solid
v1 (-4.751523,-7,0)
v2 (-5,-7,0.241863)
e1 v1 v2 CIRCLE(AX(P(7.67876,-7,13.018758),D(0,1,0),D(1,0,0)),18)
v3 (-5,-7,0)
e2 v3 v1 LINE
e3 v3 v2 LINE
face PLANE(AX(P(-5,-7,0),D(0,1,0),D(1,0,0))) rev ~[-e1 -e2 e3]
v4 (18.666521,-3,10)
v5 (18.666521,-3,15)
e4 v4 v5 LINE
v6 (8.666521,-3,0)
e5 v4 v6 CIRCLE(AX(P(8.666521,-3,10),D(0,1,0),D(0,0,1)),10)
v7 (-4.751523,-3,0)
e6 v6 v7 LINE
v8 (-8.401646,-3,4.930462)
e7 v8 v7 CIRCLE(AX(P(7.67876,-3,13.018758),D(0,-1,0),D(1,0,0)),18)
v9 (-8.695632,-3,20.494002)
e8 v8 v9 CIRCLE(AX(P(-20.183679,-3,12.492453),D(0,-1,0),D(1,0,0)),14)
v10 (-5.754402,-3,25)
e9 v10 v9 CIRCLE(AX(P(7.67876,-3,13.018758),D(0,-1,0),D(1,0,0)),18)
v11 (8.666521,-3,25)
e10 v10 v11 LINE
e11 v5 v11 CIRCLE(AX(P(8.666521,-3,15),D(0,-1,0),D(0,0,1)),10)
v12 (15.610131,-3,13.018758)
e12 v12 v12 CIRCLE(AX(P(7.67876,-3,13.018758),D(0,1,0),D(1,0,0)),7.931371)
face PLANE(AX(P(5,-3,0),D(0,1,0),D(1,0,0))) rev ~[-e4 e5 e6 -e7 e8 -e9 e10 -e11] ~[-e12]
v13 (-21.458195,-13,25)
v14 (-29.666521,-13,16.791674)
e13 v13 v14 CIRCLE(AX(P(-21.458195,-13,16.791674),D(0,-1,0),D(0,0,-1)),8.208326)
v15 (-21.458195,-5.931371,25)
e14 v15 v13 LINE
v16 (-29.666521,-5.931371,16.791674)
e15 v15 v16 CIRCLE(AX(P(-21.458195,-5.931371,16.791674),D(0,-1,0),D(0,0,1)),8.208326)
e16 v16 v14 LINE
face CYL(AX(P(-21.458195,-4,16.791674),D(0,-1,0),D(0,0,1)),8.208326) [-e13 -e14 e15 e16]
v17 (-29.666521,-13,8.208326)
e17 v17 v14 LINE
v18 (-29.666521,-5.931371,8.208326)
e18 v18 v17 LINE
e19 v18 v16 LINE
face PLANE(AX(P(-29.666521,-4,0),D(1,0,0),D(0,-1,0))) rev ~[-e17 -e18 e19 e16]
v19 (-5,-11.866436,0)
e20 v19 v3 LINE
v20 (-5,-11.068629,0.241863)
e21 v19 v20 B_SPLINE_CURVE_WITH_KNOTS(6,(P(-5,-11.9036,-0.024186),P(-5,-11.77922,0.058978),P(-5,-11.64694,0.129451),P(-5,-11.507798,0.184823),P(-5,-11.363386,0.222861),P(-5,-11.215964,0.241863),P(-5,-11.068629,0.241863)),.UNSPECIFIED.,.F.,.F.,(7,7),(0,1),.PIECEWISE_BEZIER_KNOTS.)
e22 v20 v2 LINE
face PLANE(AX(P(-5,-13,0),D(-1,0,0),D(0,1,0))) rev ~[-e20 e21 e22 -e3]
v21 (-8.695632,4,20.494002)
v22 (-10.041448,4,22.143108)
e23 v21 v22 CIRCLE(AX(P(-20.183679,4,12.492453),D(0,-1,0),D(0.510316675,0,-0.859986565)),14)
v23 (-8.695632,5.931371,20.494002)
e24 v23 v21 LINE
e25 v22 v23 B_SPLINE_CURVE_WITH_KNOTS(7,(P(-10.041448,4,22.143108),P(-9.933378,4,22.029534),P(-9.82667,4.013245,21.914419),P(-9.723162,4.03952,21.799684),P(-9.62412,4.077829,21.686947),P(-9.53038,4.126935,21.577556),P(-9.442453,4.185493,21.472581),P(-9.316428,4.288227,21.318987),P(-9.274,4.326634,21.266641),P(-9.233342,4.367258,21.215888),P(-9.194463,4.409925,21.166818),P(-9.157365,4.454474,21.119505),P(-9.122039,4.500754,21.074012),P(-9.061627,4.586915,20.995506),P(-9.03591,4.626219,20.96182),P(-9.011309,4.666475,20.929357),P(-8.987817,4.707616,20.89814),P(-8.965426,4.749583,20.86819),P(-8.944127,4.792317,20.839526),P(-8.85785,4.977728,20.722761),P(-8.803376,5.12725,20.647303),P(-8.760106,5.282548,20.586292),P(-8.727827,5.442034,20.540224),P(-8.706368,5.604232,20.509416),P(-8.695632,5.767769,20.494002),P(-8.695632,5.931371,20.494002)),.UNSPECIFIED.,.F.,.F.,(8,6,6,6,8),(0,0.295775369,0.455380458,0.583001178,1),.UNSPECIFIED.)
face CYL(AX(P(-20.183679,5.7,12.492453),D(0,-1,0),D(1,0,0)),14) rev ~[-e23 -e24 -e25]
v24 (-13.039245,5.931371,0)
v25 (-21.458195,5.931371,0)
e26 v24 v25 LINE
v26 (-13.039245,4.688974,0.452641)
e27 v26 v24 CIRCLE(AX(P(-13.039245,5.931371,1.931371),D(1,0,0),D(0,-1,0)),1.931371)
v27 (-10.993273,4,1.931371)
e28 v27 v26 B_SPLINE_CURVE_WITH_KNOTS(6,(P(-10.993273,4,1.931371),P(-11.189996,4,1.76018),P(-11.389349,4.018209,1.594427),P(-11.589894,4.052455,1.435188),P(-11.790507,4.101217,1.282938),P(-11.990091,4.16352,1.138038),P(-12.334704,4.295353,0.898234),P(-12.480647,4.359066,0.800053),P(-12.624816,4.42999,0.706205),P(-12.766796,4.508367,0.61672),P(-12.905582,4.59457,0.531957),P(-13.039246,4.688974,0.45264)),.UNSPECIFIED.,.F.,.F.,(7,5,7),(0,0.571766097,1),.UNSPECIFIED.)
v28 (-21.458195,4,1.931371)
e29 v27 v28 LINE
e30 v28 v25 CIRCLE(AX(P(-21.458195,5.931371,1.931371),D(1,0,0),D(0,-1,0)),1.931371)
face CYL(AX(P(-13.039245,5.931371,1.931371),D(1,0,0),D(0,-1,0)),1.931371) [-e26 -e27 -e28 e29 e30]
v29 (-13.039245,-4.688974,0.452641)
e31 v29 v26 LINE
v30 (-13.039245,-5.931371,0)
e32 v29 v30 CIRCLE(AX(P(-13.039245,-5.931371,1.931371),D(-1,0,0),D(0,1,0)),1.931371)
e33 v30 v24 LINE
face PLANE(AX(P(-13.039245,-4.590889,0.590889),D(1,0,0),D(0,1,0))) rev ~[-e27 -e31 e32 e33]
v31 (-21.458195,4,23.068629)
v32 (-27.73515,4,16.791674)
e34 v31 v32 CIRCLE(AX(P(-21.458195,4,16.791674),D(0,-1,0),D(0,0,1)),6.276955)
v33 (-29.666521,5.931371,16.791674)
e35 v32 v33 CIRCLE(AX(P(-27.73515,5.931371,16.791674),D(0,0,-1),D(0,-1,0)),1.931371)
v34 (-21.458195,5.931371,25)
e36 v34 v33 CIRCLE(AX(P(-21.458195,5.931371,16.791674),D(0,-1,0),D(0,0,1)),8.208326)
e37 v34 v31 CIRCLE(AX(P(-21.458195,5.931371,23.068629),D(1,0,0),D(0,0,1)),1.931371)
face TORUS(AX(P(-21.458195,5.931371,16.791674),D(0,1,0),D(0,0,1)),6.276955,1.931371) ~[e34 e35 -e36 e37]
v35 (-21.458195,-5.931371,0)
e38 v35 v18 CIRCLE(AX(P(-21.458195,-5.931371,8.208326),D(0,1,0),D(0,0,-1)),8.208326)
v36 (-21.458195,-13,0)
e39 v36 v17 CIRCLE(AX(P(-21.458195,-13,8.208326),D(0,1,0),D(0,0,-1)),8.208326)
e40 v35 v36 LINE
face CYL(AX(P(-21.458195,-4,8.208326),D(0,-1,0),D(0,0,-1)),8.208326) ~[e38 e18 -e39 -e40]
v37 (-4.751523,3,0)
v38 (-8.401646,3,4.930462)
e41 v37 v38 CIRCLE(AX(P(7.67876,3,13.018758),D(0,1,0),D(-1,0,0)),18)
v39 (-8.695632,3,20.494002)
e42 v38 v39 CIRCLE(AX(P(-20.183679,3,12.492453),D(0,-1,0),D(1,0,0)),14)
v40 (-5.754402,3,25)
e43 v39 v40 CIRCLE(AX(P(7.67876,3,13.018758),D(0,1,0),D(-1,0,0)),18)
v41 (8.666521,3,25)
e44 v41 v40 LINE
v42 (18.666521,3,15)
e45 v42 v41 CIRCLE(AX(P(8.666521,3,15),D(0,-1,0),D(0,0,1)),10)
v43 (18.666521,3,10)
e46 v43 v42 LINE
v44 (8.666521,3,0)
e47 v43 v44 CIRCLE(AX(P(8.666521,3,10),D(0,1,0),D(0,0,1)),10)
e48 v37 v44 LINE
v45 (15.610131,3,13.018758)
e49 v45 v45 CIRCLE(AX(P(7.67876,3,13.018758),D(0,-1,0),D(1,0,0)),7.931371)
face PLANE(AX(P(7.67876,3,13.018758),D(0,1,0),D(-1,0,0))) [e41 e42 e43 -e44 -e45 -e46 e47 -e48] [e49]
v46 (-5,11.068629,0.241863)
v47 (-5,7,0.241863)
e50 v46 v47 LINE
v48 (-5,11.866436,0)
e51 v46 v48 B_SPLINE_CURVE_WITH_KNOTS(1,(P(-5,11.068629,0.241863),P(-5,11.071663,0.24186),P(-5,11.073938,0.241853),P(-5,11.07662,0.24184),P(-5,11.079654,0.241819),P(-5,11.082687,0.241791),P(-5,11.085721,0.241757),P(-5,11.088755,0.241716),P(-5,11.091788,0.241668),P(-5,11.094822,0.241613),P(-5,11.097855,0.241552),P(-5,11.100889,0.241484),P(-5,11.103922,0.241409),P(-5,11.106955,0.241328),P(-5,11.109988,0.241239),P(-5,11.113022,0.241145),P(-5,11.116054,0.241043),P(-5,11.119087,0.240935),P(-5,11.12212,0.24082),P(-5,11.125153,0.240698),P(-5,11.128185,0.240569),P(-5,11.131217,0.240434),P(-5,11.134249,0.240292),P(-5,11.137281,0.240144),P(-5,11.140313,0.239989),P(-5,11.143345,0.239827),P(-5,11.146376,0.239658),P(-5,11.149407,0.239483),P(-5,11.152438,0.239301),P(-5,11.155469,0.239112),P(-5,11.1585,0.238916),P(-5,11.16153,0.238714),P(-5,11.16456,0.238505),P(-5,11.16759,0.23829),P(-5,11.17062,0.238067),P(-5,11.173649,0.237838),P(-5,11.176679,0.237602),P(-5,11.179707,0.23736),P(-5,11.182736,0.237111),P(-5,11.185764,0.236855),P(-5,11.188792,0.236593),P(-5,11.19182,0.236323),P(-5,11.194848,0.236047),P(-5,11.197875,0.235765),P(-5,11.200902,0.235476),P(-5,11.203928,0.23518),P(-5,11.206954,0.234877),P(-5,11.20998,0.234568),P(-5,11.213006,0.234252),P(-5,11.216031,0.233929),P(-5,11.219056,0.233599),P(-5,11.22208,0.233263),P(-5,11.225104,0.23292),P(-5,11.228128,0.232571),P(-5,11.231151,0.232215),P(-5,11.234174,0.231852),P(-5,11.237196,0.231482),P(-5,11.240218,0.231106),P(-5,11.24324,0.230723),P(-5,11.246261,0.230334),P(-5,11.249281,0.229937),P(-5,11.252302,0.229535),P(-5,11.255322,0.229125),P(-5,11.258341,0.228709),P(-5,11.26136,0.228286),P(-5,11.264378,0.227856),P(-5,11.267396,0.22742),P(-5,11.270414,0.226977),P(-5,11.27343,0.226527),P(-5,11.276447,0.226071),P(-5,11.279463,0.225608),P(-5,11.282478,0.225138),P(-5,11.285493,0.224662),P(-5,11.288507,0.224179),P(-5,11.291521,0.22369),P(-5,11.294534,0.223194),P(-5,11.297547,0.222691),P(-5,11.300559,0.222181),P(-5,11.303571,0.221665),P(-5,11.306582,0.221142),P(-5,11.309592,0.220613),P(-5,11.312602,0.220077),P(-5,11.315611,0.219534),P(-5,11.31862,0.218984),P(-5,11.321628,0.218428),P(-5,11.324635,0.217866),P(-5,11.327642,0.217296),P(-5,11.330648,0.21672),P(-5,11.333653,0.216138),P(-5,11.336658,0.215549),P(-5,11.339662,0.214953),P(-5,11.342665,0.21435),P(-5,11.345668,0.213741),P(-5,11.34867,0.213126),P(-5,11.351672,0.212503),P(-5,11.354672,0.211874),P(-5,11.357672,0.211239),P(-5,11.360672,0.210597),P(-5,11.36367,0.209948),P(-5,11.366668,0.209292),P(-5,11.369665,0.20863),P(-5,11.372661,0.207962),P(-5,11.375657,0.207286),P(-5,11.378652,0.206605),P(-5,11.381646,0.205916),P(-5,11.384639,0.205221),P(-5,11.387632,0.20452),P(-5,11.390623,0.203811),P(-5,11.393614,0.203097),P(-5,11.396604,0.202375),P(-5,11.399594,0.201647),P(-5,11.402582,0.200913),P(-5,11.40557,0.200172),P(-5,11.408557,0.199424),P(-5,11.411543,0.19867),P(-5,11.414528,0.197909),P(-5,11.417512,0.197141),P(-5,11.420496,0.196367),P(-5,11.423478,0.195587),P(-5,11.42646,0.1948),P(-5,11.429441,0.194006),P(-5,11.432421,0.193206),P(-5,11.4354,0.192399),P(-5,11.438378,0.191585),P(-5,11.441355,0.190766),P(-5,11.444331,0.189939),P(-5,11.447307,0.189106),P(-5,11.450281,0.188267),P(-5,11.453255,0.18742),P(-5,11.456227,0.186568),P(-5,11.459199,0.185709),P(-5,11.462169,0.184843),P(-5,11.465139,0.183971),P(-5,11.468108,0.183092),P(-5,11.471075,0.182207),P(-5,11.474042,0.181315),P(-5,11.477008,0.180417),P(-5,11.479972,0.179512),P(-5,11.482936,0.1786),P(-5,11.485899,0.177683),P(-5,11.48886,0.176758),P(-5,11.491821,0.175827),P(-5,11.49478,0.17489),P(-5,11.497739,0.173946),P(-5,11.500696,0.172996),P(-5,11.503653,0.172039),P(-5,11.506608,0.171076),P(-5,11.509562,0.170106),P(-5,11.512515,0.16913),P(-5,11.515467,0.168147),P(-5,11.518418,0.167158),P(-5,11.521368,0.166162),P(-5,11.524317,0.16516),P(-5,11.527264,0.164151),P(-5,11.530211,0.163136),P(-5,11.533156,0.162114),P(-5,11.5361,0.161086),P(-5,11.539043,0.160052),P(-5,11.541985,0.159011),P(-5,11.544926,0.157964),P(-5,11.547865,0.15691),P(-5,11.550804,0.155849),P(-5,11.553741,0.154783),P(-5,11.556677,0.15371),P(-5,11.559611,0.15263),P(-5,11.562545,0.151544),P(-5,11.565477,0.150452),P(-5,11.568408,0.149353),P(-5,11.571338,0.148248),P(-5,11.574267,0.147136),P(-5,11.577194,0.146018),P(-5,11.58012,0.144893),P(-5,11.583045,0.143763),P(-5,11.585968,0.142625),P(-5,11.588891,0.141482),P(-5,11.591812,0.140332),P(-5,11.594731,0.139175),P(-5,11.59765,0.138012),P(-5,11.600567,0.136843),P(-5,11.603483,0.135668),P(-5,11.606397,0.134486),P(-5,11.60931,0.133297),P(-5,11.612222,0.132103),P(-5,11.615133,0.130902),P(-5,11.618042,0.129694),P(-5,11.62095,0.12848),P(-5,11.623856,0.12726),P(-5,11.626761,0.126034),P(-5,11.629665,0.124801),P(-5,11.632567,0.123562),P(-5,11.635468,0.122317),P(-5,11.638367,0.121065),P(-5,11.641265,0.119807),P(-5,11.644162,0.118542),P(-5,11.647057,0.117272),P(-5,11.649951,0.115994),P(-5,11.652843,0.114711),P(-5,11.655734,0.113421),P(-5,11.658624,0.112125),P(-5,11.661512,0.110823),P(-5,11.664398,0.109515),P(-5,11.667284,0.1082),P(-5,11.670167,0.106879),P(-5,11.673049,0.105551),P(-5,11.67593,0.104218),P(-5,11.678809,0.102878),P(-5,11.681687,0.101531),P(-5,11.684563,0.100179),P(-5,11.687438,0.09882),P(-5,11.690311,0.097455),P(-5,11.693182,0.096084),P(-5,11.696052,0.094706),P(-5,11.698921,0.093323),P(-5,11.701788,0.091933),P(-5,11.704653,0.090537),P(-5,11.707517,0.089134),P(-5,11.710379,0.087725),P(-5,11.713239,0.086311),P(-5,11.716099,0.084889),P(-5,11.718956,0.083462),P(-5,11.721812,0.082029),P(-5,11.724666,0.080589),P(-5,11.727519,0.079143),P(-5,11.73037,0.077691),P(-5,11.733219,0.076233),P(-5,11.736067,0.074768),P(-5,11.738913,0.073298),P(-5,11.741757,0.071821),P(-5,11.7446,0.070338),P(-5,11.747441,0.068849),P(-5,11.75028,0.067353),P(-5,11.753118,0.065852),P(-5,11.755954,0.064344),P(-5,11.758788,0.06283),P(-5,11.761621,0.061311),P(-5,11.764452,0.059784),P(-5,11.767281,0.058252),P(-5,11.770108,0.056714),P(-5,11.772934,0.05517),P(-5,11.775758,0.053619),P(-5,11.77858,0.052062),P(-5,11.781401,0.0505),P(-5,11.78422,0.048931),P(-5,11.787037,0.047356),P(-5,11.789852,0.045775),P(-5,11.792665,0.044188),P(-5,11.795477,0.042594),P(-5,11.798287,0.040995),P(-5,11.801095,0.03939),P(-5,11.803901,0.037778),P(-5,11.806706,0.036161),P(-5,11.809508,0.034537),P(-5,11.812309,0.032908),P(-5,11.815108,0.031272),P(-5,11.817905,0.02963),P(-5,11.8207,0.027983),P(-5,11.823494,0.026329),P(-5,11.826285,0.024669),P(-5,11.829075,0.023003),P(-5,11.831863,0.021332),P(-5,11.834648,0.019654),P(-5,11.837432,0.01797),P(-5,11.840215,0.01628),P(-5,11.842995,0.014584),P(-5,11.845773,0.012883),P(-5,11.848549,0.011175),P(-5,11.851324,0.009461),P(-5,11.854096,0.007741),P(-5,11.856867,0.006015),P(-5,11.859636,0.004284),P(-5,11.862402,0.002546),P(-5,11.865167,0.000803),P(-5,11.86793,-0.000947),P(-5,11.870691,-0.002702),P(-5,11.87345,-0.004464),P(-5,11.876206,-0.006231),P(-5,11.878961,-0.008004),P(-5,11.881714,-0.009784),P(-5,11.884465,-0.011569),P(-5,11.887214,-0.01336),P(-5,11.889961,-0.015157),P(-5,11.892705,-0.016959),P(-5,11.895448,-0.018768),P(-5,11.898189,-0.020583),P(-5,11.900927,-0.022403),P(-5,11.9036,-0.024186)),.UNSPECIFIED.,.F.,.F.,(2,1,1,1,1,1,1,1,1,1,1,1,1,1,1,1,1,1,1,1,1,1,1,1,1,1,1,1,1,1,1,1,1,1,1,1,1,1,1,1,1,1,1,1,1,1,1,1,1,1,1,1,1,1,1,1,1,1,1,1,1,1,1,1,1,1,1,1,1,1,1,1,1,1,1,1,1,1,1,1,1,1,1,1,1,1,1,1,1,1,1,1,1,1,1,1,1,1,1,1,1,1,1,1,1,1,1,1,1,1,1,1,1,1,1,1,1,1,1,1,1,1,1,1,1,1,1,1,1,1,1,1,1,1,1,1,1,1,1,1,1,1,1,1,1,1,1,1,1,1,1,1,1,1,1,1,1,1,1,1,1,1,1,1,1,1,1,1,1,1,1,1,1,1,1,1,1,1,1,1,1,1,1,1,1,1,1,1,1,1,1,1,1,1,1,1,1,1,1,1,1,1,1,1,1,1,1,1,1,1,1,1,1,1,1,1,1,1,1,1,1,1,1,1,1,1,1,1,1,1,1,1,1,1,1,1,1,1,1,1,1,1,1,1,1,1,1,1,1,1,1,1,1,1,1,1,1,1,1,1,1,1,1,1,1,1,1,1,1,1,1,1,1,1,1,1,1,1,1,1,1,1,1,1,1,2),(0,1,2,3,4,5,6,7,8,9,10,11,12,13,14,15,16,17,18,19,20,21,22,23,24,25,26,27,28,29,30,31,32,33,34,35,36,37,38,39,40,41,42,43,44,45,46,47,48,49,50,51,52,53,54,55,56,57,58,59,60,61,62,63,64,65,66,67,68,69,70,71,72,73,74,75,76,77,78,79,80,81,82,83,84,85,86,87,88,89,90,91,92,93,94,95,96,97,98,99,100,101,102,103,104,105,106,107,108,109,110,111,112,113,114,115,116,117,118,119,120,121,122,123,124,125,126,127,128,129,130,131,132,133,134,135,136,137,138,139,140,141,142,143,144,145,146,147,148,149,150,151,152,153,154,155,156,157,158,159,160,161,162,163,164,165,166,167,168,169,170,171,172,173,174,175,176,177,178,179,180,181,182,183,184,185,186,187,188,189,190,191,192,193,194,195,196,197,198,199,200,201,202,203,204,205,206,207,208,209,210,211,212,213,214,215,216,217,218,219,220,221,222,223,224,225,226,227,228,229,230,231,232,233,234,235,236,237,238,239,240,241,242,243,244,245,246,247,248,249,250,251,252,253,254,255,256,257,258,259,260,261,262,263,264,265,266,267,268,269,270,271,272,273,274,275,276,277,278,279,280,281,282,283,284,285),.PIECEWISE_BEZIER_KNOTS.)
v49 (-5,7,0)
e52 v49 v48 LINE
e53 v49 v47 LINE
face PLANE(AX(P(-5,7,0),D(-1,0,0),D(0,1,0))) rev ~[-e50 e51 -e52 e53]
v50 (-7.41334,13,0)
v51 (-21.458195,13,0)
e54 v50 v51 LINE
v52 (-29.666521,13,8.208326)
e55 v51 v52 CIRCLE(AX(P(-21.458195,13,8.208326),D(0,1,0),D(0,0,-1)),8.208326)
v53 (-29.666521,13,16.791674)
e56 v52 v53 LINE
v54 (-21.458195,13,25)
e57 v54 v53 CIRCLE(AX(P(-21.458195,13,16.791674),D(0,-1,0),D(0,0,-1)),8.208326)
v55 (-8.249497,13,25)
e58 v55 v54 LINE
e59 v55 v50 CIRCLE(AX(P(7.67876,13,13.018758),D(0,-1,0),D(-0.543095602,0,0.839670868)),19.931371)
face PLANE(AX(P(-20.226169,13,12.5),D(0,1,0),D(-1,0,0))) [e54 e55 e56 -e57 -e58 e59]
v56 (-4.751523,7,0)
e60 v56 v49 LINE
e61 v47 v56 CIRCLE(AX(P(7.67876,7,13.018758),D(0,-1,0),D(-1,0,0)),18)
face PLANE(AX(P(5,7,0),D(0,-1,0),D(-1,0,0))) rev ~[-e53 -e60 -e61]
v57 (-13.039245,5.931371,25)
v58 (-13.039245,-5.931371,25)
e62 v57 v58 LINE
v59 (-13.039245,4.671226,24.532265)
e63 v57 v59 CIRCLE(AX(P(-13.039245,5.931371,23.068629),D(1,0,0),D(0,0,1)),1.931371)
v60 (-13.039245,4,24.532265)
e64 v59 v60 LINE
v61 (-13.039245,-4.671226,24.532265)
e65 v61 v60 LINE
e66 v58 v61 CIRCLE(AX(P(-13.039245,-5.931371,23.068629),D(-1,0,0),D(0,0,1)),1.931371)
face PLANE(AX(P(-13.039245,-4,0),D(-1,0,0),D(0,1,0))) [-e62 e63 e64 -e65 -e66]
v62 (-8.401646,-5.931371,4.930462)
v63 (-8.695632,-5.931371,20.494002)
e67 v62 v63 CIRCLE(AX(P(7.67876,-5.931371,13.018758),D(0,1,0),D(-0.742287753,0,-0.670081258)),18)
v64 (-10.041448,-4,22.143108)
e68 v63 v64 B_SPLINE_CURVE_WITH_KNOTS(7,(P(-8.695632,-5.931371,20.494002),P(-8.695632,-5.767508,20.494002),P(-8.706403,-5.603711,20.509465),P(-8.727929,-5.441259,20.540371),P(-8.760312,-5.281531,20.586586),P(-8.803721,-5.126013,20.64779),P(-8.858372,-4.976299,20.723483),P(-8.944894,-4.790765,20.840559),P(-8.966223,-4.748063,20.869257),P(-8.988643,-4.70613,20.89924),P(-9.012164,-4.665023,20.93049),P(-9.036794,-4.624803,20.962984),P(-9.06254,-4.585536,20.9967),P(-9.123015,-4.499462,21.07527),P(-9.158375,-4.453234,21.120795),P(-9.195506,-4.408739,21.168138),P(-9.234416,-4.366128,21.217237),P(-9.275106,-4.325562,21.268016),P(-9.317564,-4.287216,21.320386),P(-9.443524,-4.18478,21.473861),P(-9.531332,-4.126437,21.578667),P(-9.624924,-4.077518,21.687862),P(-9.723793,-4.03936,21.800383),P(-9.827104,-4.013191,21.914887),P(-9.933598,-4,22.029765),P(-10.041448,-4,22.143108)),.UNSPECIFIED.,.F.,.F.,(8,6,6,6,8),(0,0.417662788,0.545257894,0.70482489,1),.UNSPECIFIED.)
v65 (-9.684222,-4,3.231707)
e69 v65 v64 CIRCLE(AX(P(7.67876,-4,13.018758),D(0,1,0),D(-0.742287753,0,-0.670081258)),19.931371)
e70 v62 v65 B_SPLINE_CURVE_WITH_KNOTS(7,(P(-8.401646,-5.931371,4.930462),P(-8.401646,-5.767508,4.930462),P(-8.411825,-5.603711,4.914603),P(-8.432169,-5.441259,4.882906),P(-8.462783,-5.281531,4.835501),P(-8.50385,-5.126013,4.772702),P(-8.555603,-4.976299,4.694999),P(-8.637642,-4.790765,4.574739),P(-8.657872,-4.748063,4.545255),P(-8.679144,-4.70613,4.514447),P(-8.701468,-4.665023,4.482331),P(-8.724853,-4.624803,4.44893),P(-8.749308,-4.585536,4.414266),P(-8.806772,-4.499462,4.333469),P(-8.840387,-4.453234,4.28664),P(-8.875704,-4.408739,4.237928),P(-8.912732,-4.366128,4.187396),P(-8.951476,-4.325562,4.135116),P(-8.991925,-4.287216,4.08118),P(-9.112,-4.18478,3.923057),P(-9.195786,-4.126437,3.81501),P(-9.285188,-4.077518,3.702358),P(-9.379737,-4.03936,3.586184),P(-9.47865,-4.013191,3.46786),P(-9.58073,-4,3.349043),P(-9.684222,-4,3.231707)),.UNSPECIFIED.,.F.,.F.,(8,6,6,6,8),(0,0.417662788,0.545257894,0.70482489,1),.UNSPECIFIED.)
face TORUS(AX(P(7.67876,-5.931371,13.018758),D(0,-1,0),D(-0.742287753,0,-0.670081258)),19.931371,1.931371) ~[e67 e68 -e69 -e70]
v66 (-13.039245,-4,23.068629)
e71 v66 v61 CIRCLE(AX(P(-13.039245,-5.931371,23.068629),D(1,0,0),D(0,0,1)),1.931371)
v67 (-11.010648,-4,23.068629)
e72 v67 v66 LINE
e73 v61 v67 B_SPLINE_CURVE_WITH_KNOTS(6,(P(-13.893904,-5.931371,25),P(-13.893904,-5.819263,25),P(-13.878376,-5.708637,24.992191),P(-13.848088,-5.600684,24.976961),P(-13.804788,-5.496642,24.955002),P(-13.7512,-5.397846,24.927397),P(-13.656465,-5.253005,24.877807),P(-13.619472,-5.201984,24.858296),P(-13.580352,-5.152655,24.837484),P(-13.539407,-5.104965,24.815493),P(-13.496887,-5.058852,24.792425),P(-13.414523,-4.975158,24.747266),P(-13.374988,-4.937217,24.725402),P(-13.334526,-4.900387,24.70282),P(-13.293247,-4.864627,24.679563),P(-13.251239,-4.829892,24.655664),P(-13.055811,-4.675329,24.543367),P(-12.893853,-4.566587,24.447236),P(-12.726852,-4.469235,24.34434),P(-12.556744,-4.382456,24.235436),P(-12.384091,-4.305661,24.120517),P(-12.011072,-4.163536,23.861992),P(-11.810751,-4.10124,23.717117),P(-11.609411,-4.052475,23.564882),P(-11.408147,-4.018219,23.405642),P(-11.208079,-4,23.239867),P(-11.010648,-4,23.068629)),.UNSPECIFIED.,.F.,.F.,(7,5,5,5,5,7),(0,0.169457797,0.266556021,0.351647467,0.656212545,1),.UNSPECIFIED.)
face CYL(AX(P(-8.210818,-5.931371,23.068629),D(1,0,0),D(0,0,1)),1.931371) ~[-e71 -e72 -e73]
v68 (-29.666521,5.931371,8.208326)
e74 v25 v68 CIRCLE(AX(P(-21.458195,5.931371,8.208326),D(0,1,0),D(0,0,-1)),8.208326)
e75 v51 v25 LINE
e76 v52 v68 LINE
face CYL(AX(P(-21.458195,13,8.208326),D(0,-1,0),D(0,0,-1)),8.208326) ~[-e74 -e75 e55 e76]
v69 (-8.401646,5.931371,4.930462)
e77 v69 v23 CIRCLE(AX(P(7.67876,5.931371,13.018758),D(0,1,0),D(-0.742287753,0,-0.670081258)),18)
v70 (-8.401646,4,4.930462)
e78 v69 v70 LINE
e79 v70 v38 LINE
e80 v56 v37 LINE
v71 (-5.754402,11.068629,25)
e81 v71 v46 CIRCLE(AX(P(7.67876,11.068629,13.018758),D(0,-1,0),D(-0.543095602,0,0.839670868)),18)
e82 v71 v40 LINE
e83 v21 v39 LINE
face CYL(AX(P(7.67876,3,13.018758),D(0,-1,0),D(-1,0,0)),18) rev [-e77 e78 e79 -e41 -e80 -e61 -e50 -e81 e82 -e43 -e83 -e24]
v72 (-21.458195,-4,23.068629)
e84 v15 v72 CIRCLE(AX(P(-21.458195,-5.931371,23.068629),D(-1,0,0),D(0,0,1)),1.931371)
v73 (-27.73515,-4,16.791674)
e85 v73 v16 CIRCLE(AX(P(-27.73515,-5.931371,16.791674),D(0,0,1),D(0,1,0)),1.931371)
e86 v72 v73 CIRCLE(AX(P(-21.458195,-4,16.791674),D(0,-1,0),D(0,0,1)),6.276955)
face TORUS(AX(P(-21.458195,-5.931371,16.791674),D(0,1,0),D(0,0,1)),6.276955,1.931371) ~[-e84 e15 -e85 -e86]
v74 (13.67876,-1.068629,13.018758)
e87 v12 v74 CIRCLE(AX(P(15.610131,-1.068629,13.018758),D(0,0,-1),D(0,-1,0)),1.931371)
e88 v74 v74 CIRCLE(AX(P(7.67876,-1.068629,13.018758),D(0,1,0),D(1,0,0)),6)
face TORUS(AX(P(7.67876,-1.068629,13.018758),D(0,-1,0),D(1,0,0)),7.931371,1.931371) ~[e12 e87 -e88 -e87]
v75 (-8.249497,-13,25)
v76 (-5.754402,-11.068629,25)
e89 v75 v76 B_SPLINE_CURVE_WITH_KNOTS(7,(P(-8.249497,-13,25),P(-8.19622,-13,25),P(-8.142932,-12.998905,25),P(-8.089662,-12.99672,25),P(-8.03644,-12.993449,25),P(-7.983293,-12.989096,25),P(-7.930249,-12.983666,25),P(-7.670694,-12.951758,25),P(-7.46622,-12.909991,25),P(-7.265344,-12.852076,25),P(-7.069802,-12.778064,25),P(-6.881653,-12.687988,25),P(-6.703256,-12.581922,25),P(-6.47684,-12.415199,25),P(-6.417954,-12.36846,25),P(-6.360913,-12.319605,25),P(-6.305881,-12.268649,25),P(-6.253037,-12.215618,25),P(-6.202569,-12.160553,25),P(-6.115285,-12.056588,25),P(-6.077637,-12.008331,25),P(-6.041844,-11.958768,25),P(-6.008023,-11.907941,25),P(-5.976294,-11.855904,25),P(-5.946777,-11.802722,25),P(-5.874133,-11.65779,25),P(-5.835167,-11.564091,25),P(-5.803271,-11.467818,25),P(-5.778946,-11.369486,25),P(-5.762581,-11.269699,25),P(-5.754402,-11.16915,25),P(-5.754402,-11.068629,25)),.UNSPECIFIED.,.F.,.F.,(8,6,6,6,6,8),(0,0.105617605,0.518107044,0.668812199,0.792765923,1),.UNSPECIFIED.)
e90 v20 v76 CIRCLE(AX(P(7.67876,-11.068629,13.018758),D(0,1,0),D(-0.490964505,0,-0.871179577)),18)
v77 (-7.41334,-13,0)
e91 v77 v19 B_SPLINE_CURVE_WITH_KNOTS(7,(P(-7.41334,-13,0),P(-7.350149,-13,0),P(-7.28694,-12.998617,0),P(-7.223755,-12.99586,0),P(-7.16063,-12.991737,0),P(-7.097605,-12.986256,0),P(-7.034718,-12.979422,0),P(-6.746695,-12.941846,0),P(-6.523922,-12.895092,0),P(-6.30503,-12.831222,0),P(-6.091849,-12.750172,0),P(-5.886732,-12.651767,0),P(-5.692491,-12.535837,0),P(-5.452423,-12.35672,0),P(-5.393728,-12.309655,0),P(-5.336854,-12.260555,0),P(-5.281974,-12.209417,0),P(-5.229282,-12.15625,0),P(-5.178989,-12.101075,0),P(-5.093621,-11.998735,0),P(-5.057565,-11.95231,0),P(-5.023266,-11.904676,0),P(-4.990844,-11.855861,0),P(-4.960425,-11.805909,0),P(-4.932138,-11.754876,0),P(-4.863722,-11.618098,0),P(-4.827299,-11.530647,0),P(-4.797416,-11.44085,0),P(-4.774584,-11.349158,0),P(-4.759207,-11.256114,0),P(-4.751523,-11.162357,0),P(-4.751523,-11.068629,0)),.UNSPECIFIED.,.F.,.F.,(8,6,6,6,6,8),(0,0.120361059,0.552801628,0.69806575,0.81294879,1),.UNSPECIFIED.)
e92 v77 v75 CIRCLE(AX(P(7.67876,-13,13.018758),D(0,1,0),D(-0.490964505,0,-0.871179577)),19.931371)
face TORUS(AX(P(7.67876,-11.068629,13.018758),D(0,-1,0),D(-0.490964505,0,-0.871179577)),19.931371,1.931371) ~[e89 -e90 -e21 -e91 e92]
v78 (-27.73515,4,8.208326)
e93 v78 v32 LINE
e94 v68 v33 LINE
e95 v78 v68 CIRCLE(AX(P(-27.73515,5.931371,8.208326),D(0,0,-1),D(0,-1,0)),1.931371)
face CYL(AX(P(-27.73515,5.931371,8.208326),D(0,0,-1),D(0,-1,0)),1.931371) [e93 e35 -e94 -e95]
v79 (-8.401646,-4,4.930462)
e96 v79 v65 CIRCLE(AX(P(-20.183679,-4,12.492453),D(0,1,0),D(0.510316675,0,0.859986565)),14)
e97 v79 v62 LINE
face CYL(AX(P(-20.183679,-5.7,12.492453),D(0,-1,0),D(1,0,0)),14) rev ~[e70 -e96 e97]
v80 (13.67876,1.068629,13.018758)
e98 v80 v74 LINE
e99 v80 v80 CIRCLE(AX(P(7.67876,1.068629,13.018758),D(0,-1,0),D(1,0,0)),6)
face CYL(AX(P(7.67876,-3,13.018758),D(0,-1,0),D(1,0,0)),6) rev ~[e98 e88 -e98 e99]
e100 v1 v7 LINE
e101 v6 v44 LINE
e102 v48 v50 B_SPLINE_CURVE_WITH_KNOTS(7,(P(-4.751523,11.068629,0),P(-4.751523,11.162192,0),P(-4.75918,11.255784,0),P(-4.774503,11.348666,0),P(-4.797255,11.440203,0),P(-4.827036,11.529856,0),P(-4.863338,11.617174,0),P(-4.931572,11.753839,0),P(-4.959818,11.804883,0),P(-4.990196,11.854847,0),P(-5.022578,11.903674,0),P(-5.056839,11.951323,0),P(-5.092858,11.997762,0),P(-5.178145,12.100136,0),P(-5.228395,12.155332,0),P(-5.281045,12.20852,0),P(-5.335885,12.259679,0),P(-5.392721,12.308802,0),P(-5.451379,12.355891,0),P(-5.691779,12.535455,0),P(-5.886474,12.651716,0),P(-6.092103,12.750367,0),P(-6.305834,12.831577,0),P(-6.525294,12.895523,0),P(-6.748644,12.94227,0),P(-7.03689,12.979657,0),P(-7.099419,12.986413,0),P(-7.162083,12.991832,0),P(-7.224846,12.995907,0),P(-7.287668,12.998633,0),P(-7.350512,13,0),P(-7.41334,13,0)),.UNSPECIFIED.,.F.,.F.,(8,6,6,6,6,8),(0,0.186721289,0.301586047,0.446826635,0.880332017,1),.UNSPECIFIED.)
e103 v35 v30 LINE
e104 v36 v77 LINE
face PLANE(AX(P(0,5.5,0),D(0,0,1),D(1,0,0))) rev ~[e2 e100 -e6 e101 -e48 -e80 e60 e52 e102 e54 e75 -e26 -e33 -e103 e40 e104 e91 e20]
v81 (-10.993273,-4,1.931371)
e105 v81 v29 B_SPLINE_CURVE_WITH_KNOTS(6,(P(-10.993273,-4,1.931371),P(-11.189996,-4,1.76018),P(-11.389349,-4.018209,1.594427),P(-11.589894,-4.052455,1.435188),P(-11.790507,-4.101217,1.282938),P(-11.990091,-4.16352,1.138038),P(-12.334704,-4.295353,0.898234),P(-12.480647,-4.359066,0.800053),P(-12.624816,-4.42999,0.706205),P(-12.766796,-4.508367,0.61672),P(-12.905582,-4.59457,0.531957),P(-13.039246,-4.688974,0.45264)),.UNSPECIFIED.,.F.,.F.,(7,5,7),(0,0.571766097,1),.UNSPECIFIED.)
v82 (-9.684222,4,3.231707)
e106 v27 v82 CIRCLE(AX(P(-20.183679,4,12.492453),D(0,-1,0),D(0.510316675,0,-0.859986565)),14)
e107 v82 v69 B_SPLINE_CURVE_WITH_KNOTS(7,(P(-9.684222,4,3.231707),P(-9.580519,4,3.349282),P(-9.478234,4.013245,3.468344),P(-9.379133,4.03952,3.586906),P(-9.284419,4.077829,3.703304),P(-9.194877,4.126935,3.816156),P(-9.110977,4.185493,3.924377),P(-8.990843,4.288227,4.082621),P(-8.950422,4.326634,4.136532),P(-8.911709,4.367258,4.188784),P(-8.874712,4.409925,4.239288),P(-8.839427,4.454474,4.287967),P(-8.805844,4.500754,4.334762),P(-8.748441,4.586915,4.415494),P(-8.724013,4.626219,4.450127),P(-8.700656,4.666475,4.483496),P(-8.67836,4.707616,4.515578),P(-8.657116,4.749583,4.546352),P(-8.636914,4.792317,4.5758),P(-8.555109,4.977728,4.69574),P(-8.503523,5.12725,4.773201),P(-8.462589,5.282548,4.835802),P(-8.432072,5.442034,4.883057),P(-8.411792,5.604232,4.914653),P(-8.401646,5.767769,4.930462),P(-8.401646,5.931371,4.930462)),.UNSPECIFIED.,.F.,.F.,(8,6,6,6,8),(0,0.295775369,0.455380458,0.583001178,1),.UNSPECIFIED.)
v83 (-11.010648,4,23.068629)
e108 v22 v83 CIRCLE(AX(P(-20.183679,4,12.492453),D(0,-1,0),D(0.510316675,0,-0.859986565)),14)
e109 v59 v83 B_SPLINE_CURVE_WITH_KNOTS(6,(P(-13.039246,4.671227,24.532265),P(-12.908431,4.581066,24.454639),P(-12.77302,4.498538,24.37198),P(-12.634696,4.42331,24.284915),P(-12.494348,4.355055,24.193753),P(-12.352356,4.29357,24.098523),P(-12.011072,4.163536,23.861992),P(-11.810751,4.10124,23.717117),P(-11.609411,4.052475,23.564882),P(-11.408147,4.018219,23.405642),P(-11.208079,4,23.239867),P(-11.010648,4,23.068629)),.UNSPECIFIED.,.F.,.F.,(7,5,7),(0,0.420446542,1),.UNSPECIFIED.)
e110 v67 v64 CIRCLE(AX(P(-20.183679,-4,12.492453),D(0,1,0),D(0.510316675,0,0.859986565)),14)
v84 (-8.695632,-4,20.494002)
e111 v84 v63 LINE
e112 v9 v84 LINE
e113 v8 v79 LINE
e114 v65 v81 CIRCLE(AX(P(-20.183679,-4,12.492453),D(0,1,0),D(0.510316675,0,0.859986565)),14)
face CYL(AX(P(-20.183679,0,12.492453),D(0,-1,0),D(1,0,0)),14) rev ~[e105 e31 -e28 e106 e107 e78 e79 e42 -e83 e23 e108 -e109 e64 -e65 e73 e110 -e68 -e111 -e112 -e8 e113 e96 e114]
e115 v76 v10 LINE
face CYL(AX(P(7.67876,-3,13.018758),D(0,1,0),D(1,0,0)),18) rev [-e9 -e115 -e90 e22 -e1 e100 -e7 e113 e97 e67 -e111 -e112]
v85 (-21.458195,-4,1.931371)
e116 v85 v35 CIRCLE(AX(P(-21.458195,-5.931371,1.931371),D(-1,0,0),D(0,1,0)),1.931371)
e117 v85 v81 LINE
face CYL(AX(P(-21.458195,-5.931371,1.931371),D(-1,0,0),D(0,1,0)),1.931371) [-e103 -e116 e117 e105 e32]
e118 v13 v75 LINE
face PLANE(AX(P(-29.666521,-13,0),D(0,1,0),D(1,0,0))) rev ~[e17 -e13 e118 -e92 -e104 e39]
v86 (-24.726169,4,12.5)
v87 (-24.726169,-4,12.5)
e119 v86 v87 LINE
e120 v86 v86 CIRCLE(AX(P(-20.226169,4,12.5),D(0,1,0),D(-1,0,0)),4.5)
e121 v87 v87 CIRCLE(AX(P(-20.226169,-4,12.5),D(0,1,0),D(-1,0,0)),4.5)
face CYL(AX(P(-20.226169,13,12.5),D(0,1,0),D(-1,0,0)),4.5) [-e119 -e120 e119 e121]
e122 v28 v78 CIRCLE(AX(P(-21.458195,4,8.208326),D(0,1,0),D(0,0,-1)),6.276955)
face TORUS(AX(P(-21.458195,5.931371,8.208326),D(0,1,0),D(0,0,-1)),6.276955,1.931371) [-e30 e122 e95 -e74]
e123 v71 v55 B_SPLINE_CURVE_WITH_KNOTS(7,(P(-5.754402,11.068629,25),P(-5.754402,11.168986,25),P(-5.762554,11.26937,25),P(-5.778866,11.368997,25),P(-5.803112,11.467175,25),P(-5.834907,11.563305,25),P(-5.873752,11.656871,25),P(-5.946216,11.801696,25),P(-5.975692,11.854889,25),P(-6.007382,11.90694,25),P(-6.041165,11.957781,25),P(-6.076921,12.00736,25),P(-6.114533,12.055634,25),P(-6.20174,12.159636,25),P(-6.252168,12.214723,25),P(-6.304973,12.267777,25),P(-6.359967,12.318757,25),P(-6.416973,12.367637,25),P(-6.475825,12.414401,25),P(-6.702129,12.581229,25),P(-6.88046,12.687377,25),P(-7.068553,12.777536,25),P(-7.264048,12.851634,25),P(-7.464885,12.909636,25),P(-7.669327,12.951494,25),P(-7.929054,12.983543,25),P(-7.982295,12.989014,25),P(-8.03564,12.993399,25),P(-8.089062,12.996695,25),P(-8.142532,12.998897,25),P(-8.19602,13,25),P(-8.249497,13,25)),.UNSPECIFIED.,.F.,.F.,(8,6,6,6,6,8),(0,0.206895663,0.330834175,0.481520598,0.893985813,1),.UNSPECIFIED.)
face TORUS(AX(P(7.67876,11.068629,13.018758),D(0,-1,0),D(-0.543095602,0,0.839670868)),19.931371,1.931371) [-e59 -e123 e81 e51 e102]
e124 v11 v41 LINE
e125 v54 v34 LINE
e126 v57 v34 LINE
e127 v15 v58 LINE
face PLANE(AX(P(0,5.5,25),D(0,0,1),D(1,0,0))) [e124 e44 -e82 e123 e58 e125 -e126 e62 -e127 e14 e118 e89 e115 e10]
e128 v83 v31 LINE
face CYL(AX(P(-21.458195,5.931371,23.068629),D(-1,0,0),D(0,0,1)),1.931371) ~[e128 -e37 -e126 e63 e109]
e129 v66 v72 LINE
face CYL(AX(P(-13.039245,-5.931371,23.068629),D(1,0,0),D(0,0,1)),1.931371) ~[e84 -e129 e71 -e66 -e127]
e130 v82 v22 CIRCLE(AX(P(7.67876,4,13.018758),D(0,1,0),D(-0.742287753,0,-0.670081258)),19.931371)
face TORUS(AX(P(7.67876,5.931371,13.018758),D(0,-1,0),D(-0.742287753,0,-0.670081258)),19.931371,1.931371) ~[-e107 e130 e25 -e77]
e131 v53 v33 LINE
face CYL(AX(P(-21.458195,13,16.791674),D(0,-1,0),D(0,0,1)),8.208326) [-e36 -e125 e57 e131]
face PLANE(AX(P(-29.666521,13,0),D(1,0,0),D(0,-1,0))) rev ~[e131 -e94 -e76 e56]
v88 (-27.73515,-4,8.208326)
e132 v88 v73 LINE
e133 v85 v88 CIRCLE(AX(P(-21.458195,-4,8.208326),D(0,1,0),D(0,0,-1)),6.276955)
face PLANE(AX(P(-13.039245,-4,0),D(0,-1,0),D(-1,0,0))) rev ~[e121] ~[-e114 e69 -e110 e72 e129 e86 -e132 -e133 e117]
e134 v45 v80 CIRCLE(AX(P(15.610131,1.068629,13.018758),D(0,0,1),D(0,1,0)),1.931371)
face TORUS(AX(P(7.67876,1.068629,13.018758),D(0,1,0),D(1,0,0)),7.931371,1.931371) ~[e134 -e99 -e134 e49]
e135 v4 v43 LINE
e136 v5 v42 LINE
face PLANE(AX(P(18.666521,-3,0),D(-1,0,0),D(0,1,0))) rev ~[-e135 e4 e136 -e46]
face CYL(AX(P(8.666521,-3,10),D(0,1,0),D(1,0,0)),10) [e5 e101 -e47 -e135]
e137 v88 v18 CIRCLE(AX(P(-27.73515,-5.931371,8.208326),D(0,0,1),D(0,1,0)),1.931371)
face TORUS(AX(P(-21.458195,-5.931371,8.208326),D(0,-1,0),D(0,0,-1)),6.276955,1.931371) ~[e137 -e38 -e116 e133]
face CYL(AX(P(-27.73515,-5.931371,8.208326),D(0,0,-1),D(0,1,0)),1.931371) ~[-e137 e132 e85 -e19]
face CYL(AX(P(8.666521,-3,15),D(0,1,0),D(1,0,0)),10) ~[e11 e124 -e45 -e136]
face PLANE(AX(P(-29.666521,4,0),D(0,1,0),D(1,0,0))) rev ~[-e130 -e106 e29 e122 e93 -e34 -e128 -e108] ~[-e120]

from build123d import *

# Parameters (mm, degrees)
F0_W           = 5
F0_H           = 6
F0_H_2         = 1
F0_W_2         = 13.6665210929
F0_W_3         = 3.0392452702
F0_H_3         = 8
F1_DEPTH       = 25
F2_R           = 6
F3_DEPTH       = 16.6
F4_R           = 14
F5_DEPTH       = 4
F6_R           = 4.5
F7_DEPTH       = 26
F8_R           = 18
F9_DEPTH       = 25
F10_R          = 18
F11_DEPTH      = 25
F12_R          = 10
F13_R          = 8.2083261121
F14_T1_DEPTH   = 8.5833477759
F14_T10_ANGLE  = 81.9823622478
F14_S11_R      = 14
F14_T12_DEPTH  = 16
F14_T16_ANGLE  = 81.9823622478
F14_S17_R      = 14
F14_T18_DEPTH  = 17
F14_T20_ANGLE  = 90
F14_T22_ANGLE  = 90
F14_T24_ANGLE  = 117.7013849945
F14_T26_ANGLE  = 117.7013849945
F14_T30_DEPTH  = 13.2473768354
F14_S31_R      = 14
F14_T32_DEPTH  = 8
F14_T37_DEPTH  = 8.4189497106
F14_S38_R      = 14
F14_T39_DEPTH  = 6
F14_T43_DEPTH  = 8.4189497106
F14_S44_R      = 14
F14_T45_DEPTH  = 6
F14_T49_DEPTH  = 8.4189497106
F14_S50_R      = 14
F14_T51_DEPTH  = 6
F14_T55_DEPTH  = 13.2473768354
F14_S57_R      = 14
F14_T58_DEPTH  = 8
F14_T62_DEPTH  = 8.4189497106
F14_S63_R      = 14
F14_T64_DEPTH  = 6
F14_T66_ANGLE  = 90
F14_T70_DEPTH  = 8.4189497106
F14_S71_R      = 14
F14_T72_DEPTH  = 6
F14_T76_DEPTH  = 8.4189497106
F14_S77_R      = 14
F14_T78_DEPTH  = 6
F14_T82_DEPTH  = 13.2473768354
F14_S84_R      = 14
F14_T85_DEPTH  = 8
F14_T89_DEPTH  = 8.4189497106
F14_S90_R      = 14
F14_T91_DEPTH  = 6
F14_T95_DEPTH  = 13.2473768354
F14_S97_R      = 14
F14_T98_DEPTH  = 8
F14_T102_DEPTH = 8.4189497106
F14_S103_R     = 14
F14_T104_DEPTH = 6
F14_T106_ANGLE = 90


# Not quite as in the source:
# - a fillet or chamfer that OpenCascade refuses, or shapes differently, is made with other operations: its cross-section is extruded or revolved along the edge and cut away or added


with BuildPart() as f1:
    # F0 (on Top) → F1 (new body)
    with BuildSketch(Plane.XY):
        Polygon((-5, 7), (-5, 4), (0, 4), (5, 4), (5, 7), align=None)
        Polygon((-5, -7), (5, -7), (5, -4.4536441088), (5, -4), (0, -4), (-5, -4), align=None)
        with Locations((2.5, 0)):
            Rectangle(F0_W, F0_H)
        with Locations((2.5, -3.5)):
            Rectangle(F0_W, F0_H_2)
        with Locations((2.5, 3.5)):
            Rectangle(F0_W, F0_H_2)
        Polygon((-5, -13), (-5, -7), (-5, -4), (-5, 4), (-5, 7), (-5, 13), (-29.6665210929, 13), (-29.6665210929, 4), (-13.0392452702, 4), (-10, 4), (-10, -4), (-13.0392452702, -4), (-29.6665210929, -4), (-29.6665210929, -13), align=None)
        Polygon((-5, 4), (-5, -4), (0, -4), (0, -3), (0, 3), (0, 4), align=None)
        with Locations((11.8332605464, 0)):
            Rectangle(F0_W_2, F0_H)
        with Locations((-11.5196226351, 0)):
            Rectangle(F0_W_3, F0_H_3)
    extrude(amount=F1_DEPTH)

    # F2 (on face) → F3 (cut, symmetric)
    with BuildSketch(Plane.XZ.offset(3)):
        with Locations((7.6787601748, 13.0187581394)):
            Circle(F2_R)
    extrude(amount=F3_DEPTH, both=True, mode=Mode.SUBTRACT)

    # F4 (on Front) → F5 (cut, symmetric)
    with BuildSketch(Plane.XZ):
        with Locations((-20.1836787164, 12.4924527481)):
            Circle(F4_R)
    extrude(amount=F5_DEPTH, both=True, mode=Mode.SUBTRACT)

    # F6 (on face) → F7 (join, through all)
    with BuildSketch(Plane(origin=(0, 13, 0), x_dir=(-1, 0, 0), z_dir=(0, 1, 0))):
        with Locations((20.2261688847, 12.5)):
            Circle(F6_R)
    extrude(amount=-F7_DEPTH)

    # F8 (on face) → F9 (cut)
    with BuildSketch(Plane.XZ.offset(3)):
        with Locations((7.6787601748, 13.0187581394)):
            Circle(F8_R)
        with BuildLine():
            Line((18.6665210929, 0), (5, 0))
            Line((5, 0), (5, 7.6499366742))
            ThreePointArc((5, 7.6499366742), (10.8352961679, 7.9161822679), (13.6787601748, 13.0187581394))
            ThreePointArc((13.6787601748, 13.0187581394), (10.8352961679, 18.1213340109), (5, 18.3875796047))
            Line((5, 18.3875796047), (5, 25))
            Line((5, 25), (18.6665210929, 25))
            Line((18.6665210929, 25), (18.6665210929, 0))
        make_face(mode=Mode.SUBTRACT)
    extrude(amount=F9_DEPTH, mode=Mode.SUBTRACT)

    # F10 (on face) → F11 (cut)
    with BuildSketch(Plane(origin=(0, 3, 0), x_dir=(-1, 0, 0), z_dir=(0, 1, 0))):
        with Locations((-7.6787601748, 13.0187581394)):
            Circle(F10_R)
        with BuildLine():
            Line((-5, 0), (-18.6665210929, 0))
            Line((-18.6665210929, 0), (-18.6665210929, 25))
            Line((-18.6665210929, 25), (-5, 25))
            Line((-5, 25), (-5, 18.3875796047))
            ThreePointArc((-5, 18.3875796047), (-10.8352961679, 18.1213340109), (-13.6787601748, 13.0187581394))
            ThreePointArc((-13.6787601748, 13.0187581394), (-10.8352961679, 7.9161822679), (-5, 7.6499366742))
            Line((-5, 7.6499366742), (-5, 0))
        make_face(mode=Mode.SUBTRACT)
    extrude(amount=F11_DEPTH, mode=Mode.SUBTRACT)

    # F12
    f12_edges = [f1.edges().sort_by_distance(p)[0] for p in [
        (18.666521, 0, 0),
        (18.666521, 0, 25),
    ]]
    fillet(f12_edges, radius=F12_R)

    # F13
    f13_edges = [f1.edges().sort_by_distance(p)[0] for p in [
        (-29.666521, -8.5, 0),
        (-29.666521, 8.5, 0),
        (-29.666521, 8.5, 25),
        (-29.666521, -8.5, 25),
    ]]
    fillet(f13_edges, radius=F13_R)

    # F14: fillet of radius 1.9313708499 on 16 edges, made by hand

    # F14_s2 → F14_t1 (cut)
    with BuildSketch(Plane.XY.offset(8.2083261121)):
        with BuildLine():
            ThreePointArc((-27.735150243, -4), (-29.1008356679, -4.5656854249), (-29.6665210929, -5.9313708499))
            Line((-29.6665210929, -5.9313708499), (-29.6665210929, -4))
            Line((-29.6665210929, -4), (-27.735150243, -4))
        make_face()
        with BuildLine():
            ThreePointArc((-27.735150243, 4), (-29.1008356679, 4.5656854249), (-29.6665210929, 5.9313708499))
            Line((-29.6665210929, 5.9313708499), (-29.6665210929, 4))
            Line((-29.6665210929, 4), (-27.735150243, 4))
        make_face()
    extrude(amount=F14_T1_DEPTH, mode=Mode.SUBTRACT)

    # F14_s3 → F14_t4 (revolve, cut)
    with BuildSketch(Plane.XY.offset(13.0187581394)):
        with BuildLine():
            ThreePointArc((15.6101310247, -3), (14.2444455998, -2.4343145751), (13.6787601748, -1.0686291501))
            Line((13.6787601748, -1.0686291501), (13.6787601748, -3))
            Line((13.6787601748, -3), (15.6101310247, -3))
        make_face()
    revolve(axis=Axis((7.6787601748, -3, 13.0187581394), (0, 1, 0)), mode=Mode.SUBTRACT)

    # F14_s5 → F14_t6 (revolve, cut)
    with BuildSketch(Plane.XY.offset(13.0187581394)):
        with BuildLine():
            ThreePointArc((15.6101310247, 3), (14.2444455998, 2.4343145751), (13.6787601748, 1.0686291501))
            Line((13.6787601748, 1.0686291501), (13.6787601748, 3))
            Line((13.6787601748, 3), (15.6101310247, 3))
        make_face()
    revolve(axis=Axis((7.6787601748, 3, 13.0187581394), (0, -1, 0)), mode=Mode.SUBTRACT)


with BuildPart() as f14_tool8:
    # F14_s9 → F14_t10 (revolve)
    with BuildSketch(Plane(origin=(-3.0276090133, 0, 3.3538575566), x_dir=(0, 1, 0), z_dir=(0.6700812579, 0, -0.7422877527))):
        with BuildLine():
            ThreePointArc((4, -5.5078953856), (4.5656854249, -4.1422099607), (5.9313708499, -3.5765245357))
            Line((5.9313708499, -3.5765245357), (4, -3.5765245357))
            Line((4, -3.5765245357), (4, -5.5078953856))
        make_face()
    revolve(axis=Axis((7.6787601748, 4, 13.0187581394), (0, 1, 0)), revolution_arc=F14_T10_ANGLE)

    # F14_s11 → F14_t12 (intersect, symmetric)
    with BuildSketch(Plane.XZ.offset(-5.7)):
        with Locations((-20.1836787164, 12.4924527481)):
            Circle(F14_S11_R)
    extrude(amount=F14_T12_DEPTH, both=True, mode=Mode.INTERSECT)


with BuildPart() as f1_1:
    add(f1.part)

    # F14_t7: cut F14_tool8
    add(f14_tool8.part, mode=Mode.SUBTRACT)


with BuildPart() as f14_tool14:
    # F14_s15 → F14_t16 (revolve)
    with BuildSketch(Plane(origin=(-3.0276090133, 0, 3.3538575566), x_dir=(0, 1, 0), z_dir=(0.6700812579, 0, -0.7422877527))):
        with BuildLine():
            ThreePointArc((-5.9313708499, -3.5765245357), (-4.5656854249, -4.1422099607), (-4, -5.5078953856))
            Line((-4, -5.5078953856), (-4, -3.5765245357))
            Line((-4, -3.5765245357), (-5.9313708499, -3.5765245357))
        make_face()
    revolve(axis=Axis((7.6787601748, -4, 13.0187581394), (0, 1, 0)), revolution_arc=F14_T16_ANGLE)

    # F14_s17 → F14_t18 (intersect, symmetric)
    with BuildSketch(Plane.XZ.offset(5.7)):
        with Locations((-20.1836787164, 12.4924527481)):
            Circle(F14_S17_R)
    extrude(amount=F14_T18_DEPTH, both=True, mode=Mode.INTERSECT)


with BuildPart() as f1_2:
    add(f1_1.part)

    # F14_t13: cut F14_tool14
    add(f14_tool14.part, mode=Mode.SUBTRACT)

    # F14_s19 → F14_t20 (revolve, cut)
    with BuildSketch(Plane.YZ.offset(-21.4581949808)):
        with BuildLine():
            ThreePointArc((4, 1.9313708499), (4.5656854249, 0.5656854249), (5.9313708499, 0))
            Line((5.9313708499, 0), (4, 0))
            Line((4, 0), (4, 1.9313708499))
        make_face()
    revolve(axis=Axis((-21.4581949808, 4, 8.2083261121), (0, 1, 0)), revolution_arc=F14_T20_ANGLE, mode=Mode.SUBTRACT)

    # F14_s21 → F14_t22 (revolve, cut)
    with BuildSketch(Plane.YZ.offset(-21.4581949808)):
        with BuildLine():
            ThreePointArc((-4, 1.9313708499), (-4.5656854249, 0.5656854249), (-5.9313708499, 0))
            Line((-5.9313708499, 0), (-4, 0))
            Line((-4, 0), (-4, 1.9313708499))
        make_face()
    revolve(axis=Axis((-21.4581949808, -4, 8.2083261121), (0, 1, 0)), revolution_arc=F14_T22_ANGLE, mode=Mode.SUBTRACT)

    # F14_s23 → F14_t24 (revolve, cut)
    with BuildSketch(Plane(origin=(0.2594641933, 0, -0.1462243981), x_dir=(0, 1, 0), z_dir=(0.8711795768, 0, -0.4909645049))):
        with BuildLine():
            ThreePointArc((-13, -4.8196959569), (-12.4343145751, -3.4540105319), (-11.0686291501, -2.888325107))
            Line((-11.0686291501, -2.888325107), (-13, -2.888325107))
            Line((-13, -2.888325107), (-13, -4.8196959569))
        make_face()
    revolve(axis=Axis((7.6787601748, -13, 13.0187581394), (0, 1, 0)), revolution_arc=F14_T24_ANGLE, mode=Mode.SUBTRACT)

    # F14_s25 → F14_t26 (revolve, cut)
    with BuildSketch(Plane(origin=(11.3507224474, 0, 7.3415997616), x_dir=(0, 1, 0), z_dir=(0.8396708681, 0, 0.5430956024))):
        with BuildLine():
            ThreePointArc((11.0686291501, 24.7611710656), (12.4343145751, 25.3268564905), (13, 26.6925419155))
            Line((13, 26.6925419155), (13, 24.7611710656))
            Line((13, 24.7611710656), (11.0686291501, 24.7611710656))
        make_face()
    revolve(axis=Axis((7.6787601748, 13, 13.0187581394), (0, -1, 0)), revolution_arc=F14_T26_ANGLE, mode=Mode.SUBTRACT)


with BuildPart() as f14_tool28:
    # F14_s29 → F14_t30 (new body)
    with BuildSketch(Plane.YZ.offset(-8.2108181454)):
        with BuildLine():
            ThreePointArc((-5.9313708499, 25), (-4.5656854249, 24.4343145751), (-4, 23.0686291501))
            Line((-4, 23.0686291501), (-4, 25))
            Line((-4, 25), (-5.9313708499, 25))
        make_face()
    extrude(amount=-F14_T30_DEPTH)

    # F14_s31 → F14_t32 (intersect, symmetric)
    with BuildSketch(Plane.XZ.offset(5)):
        with Locations((-20.1836787164, 12.4924527481)):
            Circle(F14_S31_R)
    extrude(amount=F14_T32_DEPTH, both=True, mode=Mode.INTERSECT)

    split(bisect_by=Plane.YZ.offset(-13.0392452702), keep=Keep.TOP)


with BuildPart() as f1_3:
    add(f1_2.part)

    # F14_t27: cut F14_tool28
    add(f14_tool28.part, mode=Mode.SUBTRACT)


with BuildPart() as f14_tool35:
    # F14_s36 → F14_t37 (new body)
    with BuildSketch(Plane.YZ.offset(-13.0392452702)):
        with BuildLine():
            ThreePointArc((-5.9313708499, 25), (-4.5656854249, 24.4343145751), (-4, 23.0686291501))
            Line((-4, 23.0686291501), (-4, 25))
            Line((-4, 25), (-5.9313708499, 25))
        make_face()
    extrude(amount=-F14_T37_DEPTH)

    # F14_s38 → F14_t39 (cut, symmetric)
    with BuildSketch(Plane.XZ.offset(5)):
        with Locations((-20.1836787164, 12.4924527481)):
            Circle(F14_S38_R)
    extrude(amount=F14_T39_DEPTH, both=True, mode=Mode.SUBTRACT)


with BuildPart() as f1_4:
    add(f1_3.part)

    # F14_t34: cut F14_tool35
    add(f14_tool35.part, mode=Mode.SUBTRACT)


with BuildPart() as f14_tool41:
    # F14_s42 → F14_t43 (new body)
    with BuildSketch(Plane.YZ.offset(-13.0392452702)):
        with BuildLine():
            ThreePointArc((-5.9313708499, 25), (-4.5656854249, 24.4343145751), (-4, 23.0686291501))
            Line((-4, 23.0686291501), (-4, 25))
            Line((-4, 25), (-5.9313708499, 25))
        make_face()
    extrude(amount=-F14_T43_DEPTH)

    # F14_s44 → F14_t45 (intersect, symmetric)
    with BuildSketch(Plane.XZ.offset(5)):
        with Locations((-20.1836787164, 12.4924527481)):
            Circle(F14_S44_R)
    extrude(amount=F14_T45_DEPTH, both=True, mode=Mode.INTERSECT)


with BuildPart() as f1_5:
    add(f1_4.part)

    # F14_t40: cut F14_tool41
    add(f14_tool41.part, mode=Mode.SUBTRACT)


with BuildPart() as f14_tool47:
    # F14_s48 → F14_t49 (new body)
    with BuildSketch(Plane.YZ.offset(-21.4581949808)):
        with BuildLine():
            ThreePointArc((5.9313708499, 25), (4.5656854249, 24.4343145751), (4, 23.0686291501))
            Line((4, 23.0686291501), (4, 25))
            Line((4, 25), (5.9313708499, 25))
        make_face()
    extrude(amount=F14_T49_DEPTH)

    # F14_s50 → F14_t51 (intersect, symmetric)
    with BuildSketch(Plane.XZ.offset(-5)):
        with Locations((-20.1836787164, 12.4924527481)):
            Circle(F14_S50_R)
    extrude(amount=F14_T51_DEPTH, both=True, mode=Mode.INTERSECT)


with BuildPart() as f1_6:
    add(f1_5.part)

    # F14_t46: cut F14_tool47
    add(f14_tool47.part, mode=Mode.SUBTRACT)


with BuildPart() as f14_tool53:
    # F14_s54 → F14_t55 (new body)
    with BuildSketch(Plane.YZ.offset(-21.4581949808)):
        with BuildLine():
            ThreePointArc((5.9313708499, 25), (4.5656854249, 24.4343145751), (4, 23.0686291501))
            Line((4, 23.0686291501), (4, 25))
            Line((4, 25), (5.9313708499, 25))
        make_face()
    extrude(amount=F14_T55_DEPTH)

    split(bisect_by=Plane.YZ.offset(-13.0392452702), keep=Keep.TOP)

    # F14_s57 → F14_t58 (intersect, symmetric)
    with BuildSketch(Plane.XZ.offset(-5)):
        with Locations((-20.1836787164, 12.4924527481)):
            Circle(F14_S57_R)
    extrude(amount=F14_T58_DEPTH, both=True, mode=Mode.INTERSECT)


with BuildPart() as f1_7:
    add(f1_6.part)

    # F14_t52: cut F14_tool53
    add(f14_tool53.part, mode=Mode.SUBTRACT)


with BuildPart() as f14_tool60:
    # F14_s61 → F14_t62 (new body)
    with BuildSketch(Plane.YZ.offset(-21.4581949808)):
        with BuildLine():
            ThreePointArc((5.9313708499, 25), (4.5656854249, 24.4343145751), (4, 23.0686291501))
            Line((4, 23.0686291501), (4, 25))
            Line((4, 25), (5.9313708499, 25))
        make_face()
    extrude(amount=F14_T62_DEPTH)

    # F14_s63 → F14_t64 (cut, symmetric)
    with BuildSketch(Plane.XZ.offset(-5)):
        with Locations((-20.1836787164, 12.4924527481)):
            Circle(F14_S63_R)
    extrude(amount=F14_T64_DEPTH, both=True, mode=Mode.SUBTRACT)


with BuildPart() as f1_8:
    add(f1_7.part)

    # F14_t59: cut F14_tool60
    add(f14_tool60.part, mode=Mode.SUBTRACT)

    # F14_s65 → F14_t66 (revolve, cut)
    with BuildSketch(Plane.YZ.offset(-21.4581949808)):
        with BuildLine():
            ThreePointArc((-5.9313708499, 25), (-4.5656854249, 24.4343145751), (-4, 23.0686291501))
            Line((-4, 23.0686291501), (-4, 25))
            Line((-4, 25), (-5.9313708499, 25))
        make_face()
    revolve(axis=Axis((-21.4581949808, -4, 16.7916738879), (0, -1, 0)), revolution_arc=F14_T66_ANGLE, mode=Mode.SUBTRACT)


with BuildPart() as f14_tool68:
    # F14_s69 → F14_t70 (new body)
    with BuildSketch(Plane.YZ.offset(-21.4581949808)):
        with BuildLine():
            ThreePointArc((-4, 1.9313708499), (-4.5656854249, 0.5656854249), (-5.9313708499, 0))
            Line((-5.9313708499, 0), (-4, 0))
            Line((-4, 0), (-4, 1.9313708499))
        make_face()
    extrude(amount=F14_T70_DEPTH)

    # F14_s71 → F14_t72 (intersect, symmetric)
    with BuildSketch(Plane.XZ.offset(5)):
        with Locations((-20.1836787164, 12.4924527481)):
            Circle(F14_S71_R)
    extrude(amount=F14_T72_DEPTH, both=True, mode=Mode.INTERSECT)


with BuildPart() as f1_9:
    add(f1_8.part)

    # F14_t67: cut F14_tool68
    add(f14_tool68.part, mode=Mode.SUBTRACT)


with BuildPart() as f14_tool74:
    # F14_s75 → F14_t76 (new body)
    with BuildSketch(Plane.YZ.offset(-21.4581949808)):
        with BuildLine():
            ThreePointArc((-4, 1.9313708499), (-4.5656854249, 0.5656854249), (-5.9313708499, 0))
            Line((-5.9313708499, 0), (-4, 0))
            Line((-4, 0), (-4, 1.9313708499))
        make_face()
    extrude(amount=F14_T76_DEPTH)

    # F14_s77 → F14_t78 (cut, symmetric)
    with BuildSketch(Plane.XZ.offset(5)):
        with Locations((-20.1836787164, 12.4924527481)):
            Circle(F14_S77_R)
    extrude(amount=F14_T78_DEPTH, both=True, mode=Mode.SUBTRACT)


with BuildPart() as f1_10:
    add(f1_9.part)

    # F14_t73: cut F14_tool74
    add(f14_tool74.part, mode=Mode.SUBTRACT)


with BuildPart() as f14_tool80:
    # F14_s81 → F14_t82 (new body)
    with BuildSketch(Plane.YZ.offset(-21.4581949808)):
        with BuildLine():
            ThreePointArc((-4, 1.9313708499), (-4.5656854249, 0.5656854249), (-5.9313708499, 0))
            Line((-5.9313708499, 0), (-4, 0))
            Line((-4, 0), (-4, 1.9313708499))
        make_face()
    extrude(amount=F14_T82_DEPTH)

    split(bisect_by=Plane.YZ.offset(-13.0392452702), keep=Keep.TOP)

    # F14_s84 → F14_t85 (intersect, symmetric)
    with BuildSketch(Plane.XZ.offset(5)):
        with Locations((-20.1836787164, 12.4924527481)):
            Circle(F14_S84_R)
    extrude(amount=F14_T85_DEPTH, both=True, mode=Mode.INTERSECT)


with BuildPart() as f1_11:
    add(f1_10.part)

    # F14_t79: cut F14_tool80
    add(f14_tool80.part, mode=Mode.SUBTRACT)


with BuildPart() as f14_tool87:
    # F14_s88 → F14_t89 (new body)
    with BuildSketch(Plane.YZ.offset(-13.0392452702)):
        with BuildLine():
            ThreePointArc((4, 1.9313708499), (4.5656854249, 0.5656854249), (5.9313708499, 0))
            Line((5.9313708499, 0), (4, 0))
            Line((4, 0), (4, 1.9313708499))
        make_face()
    extrude(amount=-F14_T89_DEPTH)

    # F14_s90 → F14_t91 (cut, symmetric)
    with BuildSketch(Plane.XZ.offset(-5)):
        with Locations((-20.1836787164, 12.4924527481)):
            Circle(F14_S90_R)
    extrude(amount=F14_T91_DEPTH, both=True, mode=Mode.SUBTRACT)


with BuildPart() as f1_12:
    add(f1_11.part)

    # F14_t86: cut F14_tool87
    add(f14_tool87.part, mode=Mode.SUBTRACT)


with BuildPart() as f14_tool93:
    # F14_s94 → F14_t95 (new body)
    with BuildSketch(Plane.YZ.offset(-8.2108181454)):
        with BuildLine():
            ThreePointArc((4, 1.9313708499), (4.5656854249, 0.5656854249), (5.9313708499, 0))
            Line((5.9313708499, 0), (4, 0))
            Line((4, 0), (4, 1.9313708499))
        make_face()
    extrude(amount=-F14_T95_DEPTH)

    split(bisect_by=Plane.YZ.offset(-13.0392452702), keep=Keep.TOP)

    # F14_s97 → F14_t98 (intersect, symmetric)
    with BuildSketch(Plane.XZ.offset(-5)):
        with Locations((-20.1836787164, 12.4924527481)):
            Circle(F14_S97_R)
    extrude(amount=F14_T98_DEPTH, both=True, mode=Mode.INTERSECT)


with BuildPart() as f1_13:
    add(f1_12.part)

    # F14_t92: cut F14_tool93
    add(f14_tool93.part, mode=Mode.SUBTRACT)


with BuildPart() as f14_tool100:
    # F14_s101 → F14_t102 (new body)
    with BuildSketch(Plane.YZ.offset(-13.0392452702)):
        with BuildLine():
            ThreePointArc((4, 1.9313708499), (4.5656854249, 0.5656854249), (5.9313708499, 0))
            Line((5.9313708499, 0), (4, 0))
            Line((4, 0), (4, 1.9313708499))
        make_face()
    extrude(amount=-F14_T102_DEPTH)

    # F14_s103 → F14_t104 (intersect, symmetric)
    with BuildSketch(Plane.XZ.offset(-5)):
        with Locations((-20.1836787164, 12.4924527481)):
            Circle(F14_S103_R)
    extrude(amount=F14_T104_DEPTH, both=True, mode=Mode.INTERSECT)


with BuildPart() as f1_14:
    add(f1_13.part)

    # F14_t99: cut F14_tool100
    add(f14_tool100.part, mode=Mode.SUBTRACT)

    # F14_s105 → F14_t106 (revolve, cut)
    with BuildSketch(Plane.YZ.offset(-21.4581949808)):
        with BuildLine():
            ThreePointArc((4, 23.0686291501), (4.5656854249, 24.4343145751), (5.9313708499, 25))
            Line((5.9313708499, 25), (4, 25))
            Line((4, 25), (4, 23.0686291501))
        make_face()
    revolve(axis=Axis((-21.4581949808, 4, 16.7916738879), (0, -1, 0)), revolution_arc=F14_T106_ANGLE, mode=Mode.SUBTRACT)


solid = f1_14.part
